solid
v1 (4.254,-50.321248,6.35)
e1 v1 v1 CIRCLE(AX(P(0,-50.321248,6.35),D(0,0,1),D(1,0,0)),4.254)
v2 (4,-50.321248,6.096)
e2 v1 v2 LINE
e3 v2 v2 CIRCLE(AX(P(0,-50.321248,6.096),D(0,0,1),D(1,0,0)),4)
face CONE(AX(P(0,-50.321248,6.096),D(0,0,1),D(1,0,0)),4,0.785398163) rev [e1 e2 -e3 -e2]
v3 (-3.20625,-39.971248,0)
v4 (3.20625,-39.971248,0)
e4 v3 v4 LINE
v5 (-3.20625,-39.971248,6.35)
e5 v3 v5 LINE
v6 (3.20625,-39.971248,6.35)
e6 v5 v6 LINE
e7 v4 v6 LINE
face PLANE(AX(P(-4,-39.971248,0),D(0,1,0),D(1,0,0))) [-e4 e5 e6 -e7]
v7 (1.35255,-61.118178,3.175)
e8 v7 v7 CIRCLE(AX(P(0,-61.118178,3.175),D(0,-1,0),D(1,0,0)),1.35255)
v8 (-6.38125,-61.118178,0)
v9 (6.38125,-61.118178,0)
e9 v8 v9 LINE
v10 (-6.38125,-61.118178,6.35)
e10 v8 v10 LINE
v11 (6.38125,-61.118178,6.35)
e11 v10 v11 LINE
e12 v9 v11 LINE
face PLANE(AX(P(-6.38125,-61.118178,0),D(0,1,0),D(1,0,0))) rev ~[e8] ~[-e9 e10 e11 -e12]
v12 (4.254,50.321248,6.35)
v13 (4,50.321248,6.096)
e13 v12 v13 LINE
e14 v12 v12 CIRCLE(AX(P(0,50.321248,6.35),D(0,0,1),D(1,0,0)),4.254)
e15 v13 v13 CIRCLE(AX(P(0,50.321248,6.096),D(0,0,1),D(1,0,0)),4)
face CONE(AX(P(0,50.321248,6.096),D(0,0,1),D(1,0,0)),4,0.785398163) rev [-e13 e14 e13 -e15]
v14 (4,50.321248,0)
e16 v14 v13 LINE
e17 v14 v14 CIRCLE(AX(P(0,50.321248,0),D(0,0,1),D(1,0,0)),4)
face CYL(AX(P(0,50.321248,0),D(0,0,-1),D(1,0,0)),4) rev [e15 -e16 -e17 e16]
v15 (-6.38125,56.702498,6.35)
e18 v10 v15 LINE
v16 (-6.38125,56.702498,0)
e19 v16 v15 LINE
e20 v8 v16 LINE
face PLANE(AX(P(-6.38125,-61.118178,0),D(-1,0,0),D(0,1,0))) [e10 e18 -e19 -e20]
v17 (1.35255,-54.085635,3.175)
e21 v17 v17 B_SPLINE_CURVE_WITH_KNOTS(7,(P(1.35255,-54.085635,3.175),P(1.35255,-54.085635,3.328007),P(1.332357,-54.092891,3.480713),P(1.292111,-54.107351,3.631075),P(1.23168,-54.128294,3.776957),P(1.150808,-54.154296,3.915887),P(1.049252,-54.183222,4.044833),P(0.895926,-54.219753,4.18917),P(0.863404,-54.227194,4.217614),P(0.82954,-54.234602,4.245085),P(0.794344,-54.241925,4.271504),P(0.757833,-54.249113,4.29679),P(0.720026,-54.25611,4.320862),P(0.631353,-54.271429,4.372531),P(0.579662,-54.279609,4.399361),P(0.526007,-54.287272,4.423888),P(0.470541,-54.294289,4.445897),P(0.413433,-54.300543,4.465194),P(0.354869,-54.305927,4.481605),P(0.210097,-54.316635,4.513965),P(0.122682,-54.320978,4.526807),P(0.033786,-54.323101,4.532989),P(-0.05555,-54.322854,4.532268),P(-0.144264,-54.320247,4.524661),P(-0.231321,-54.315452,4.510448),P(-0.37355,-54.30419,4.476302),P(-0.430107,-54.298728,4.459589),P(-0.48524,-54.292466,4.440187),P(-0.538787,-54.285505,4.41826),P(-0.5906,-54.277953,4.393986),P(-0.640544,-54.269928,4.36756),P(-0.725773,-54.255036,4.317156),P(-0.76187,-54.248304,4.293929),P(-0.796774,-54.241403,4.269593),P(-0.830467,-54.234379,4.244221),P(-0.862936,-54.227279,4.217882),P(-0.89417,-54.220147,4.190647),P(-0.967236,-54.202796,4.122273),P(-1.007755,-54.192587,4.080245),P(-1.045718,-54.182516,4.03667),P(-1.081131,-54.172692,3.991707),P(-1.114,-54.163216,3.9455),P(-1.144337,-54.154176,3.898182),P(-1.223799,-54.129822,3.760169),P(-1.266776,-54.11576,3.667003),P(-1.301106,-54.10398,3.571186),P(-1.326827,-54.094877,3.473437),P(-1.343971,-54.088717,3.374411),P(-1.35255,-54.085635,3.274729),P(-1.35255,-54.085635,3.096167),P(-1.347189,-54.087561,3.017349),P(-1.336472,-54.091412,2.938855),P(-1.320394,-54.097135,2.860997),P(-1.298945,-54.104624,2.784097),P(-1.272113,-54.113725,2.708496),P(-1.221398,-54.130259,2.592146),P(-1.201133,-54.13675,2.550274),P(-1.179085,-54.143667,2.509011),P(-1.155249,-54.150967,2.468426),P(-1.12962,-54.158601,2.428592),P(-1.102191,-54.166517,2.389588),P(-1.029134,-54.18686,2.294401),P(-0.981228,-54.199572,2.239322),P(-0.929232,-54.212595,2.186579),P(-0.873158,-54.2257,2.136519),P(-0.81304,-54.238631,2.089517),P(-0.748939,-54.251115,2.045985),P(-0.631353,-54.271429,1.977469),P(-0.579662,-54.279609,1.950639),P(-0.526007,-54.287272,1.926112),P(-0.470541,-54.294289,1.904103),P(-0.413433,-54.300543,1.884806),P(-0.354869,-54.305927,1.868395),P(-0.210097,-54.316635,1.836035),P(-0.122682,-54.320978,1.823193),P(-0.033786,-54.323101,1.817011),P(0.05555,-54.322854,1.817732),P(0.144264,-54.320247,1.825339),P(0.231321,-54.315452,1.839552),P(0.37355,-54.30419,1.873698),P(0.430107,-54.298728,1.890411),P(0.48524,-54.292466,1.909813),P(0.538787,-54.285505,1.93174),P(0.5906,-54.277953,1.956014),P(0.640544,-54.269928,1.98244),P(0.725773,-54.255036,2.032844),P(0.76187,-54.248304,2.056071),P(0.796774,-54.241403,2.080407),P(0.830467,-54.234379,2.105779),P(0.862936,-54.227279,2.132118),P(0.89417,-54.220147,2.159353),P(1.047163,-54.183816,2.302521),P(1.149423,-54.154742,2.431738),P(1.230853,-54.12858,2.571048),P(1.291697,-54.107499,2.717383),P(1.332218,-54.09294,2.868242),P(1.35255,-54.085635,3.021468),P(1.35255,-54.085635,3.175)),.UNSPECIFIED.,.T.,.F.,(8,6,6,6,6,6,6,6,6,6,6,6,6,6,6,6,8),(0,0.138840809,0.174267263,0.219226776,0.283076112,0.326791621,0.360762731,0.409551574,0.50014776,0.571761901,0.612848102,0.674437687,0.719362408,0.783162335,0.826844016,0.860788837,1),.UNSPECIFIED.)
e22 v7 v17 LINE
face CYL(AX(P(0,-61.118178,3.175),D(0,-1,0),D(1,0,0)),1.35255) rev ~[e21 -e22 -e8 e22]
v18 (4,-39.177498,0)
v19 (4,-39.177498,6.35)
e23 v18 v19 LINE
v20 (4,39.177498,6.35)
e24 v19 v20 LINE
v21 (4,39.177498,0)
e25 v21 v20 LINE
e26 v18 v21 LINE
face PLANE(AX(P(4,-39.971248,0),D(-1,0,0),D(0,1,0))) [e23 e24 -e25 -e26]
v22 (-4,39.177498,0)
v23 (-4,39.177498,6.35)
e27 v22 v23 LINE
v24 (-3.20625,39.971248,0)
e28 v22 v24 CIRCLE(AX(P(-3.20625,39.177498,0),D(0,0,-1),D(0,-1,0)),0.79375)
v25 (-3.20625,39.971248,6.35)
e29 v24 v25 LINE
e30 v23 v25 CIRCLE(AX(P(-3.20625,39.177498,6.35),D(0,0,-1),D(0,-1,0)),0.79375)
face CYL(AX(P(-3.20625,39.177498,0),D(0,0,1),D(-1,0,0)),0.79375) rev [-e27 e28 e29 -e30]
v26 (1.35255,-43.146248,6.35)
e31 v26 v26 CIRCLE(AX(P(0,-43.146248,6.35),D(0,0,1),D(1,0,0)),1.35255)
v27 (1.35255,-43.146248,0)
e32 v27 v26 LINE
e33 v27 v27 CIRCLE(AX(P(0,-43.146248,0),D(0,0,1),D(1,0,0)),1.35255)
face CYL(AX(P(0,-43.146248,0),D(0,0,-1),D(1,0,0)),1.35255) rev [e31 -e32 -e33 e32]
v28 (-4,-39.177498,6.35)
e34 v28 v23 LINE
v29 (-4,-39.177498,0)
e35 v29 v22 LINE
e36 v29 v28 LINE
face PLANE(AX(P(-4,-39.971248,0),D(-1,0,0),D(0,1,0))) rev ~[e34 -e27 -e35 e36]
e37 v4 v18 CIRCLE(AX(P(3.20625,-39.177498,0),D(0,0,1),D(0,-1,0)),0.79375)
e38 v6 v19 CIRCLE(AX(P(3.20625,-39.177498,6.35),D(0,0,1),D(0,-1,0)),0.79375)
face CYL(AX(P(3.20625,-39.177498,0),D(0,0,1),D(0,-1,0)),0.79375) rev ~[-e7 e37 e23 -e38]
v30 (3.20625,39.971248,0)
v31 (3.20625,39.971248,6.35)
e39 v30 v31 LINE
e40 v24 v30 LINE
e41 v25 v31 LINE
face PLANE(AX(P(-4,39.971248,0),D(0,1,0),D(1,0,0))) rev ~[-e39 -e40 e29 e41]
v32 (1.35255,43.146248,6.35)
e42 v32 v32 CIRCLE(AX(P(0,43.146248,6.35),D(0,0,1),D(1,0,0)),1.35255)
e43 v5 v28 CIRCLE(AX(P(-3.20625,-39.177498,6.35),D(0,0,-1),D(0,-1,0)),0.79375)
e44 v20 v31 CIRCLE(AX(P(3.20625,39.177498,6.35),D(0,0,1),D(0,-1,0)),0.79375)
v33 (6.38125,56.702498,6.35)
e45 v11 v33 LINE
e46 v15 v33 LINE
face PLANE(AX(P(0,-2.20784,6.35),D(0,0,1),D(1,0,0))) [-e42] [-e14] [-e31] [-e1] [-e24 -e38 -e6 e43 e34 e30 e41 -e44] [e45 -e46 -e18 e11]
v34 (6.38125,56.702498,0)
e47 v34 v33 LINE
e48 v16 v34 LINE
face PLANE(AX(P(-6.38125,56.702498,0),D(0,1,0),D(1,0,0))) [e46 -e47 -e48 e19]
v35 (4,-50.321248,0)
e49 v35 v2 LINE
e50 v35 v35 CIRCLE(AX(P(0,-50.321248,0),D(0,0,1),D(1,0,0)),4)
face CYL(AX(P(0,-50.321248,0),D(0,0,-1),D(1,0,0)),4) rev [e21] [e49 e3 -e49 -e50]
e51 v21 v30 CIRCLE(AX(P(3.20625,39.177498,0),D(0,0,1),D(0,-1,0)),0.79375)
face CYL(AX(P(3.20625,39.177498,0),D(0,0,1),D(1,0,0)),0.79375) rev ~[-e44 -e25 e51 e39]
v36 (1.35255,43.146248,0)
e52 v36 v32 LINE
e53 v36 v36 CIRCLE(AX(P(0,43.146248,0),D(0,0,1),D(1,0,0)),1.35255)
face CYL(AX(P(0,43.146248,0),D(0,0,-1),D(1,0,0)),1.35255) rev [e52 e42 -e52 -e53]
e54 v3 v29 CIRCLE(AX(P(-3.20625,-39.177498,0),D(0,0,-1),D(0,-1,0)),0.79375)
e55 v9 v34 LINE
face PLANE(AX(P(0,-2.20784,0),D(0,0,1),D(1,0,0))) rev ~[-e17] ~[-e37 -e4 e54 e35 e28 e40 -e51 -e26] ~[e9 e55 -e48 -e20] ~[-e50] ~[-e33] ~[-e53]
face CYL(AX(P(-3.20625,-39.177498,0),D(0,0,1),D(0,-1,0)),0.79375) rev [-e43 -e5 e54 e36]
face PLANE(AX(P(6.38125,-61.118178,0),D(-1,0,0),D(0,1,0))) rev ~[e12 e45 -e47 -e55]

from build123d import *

# Parameters (mm, degrees)
F0_W     = 12.7625
F0_H     = 117.8206766
F0_R     = 4
F0_R_2   = 1.35255
F0_W_2   = 8
F0_H_2   = 79.9424962
F1_DEPTH = 6.35
F2_R     = 0.79375
F3_SIZE  = 0.254
F4_R     = 1.35255
F5_DEPTH = 8.0325436313


# Not quite as in the source:
# - a feature names something its author has since deleted; it is built from what else it names


with BuildPart() as f1:
    # F0 (on Top) → F1 (new body)
    with BuildSketch(Plane.XY):
        with Locations((0, -2.2078402)):
            Rectangle(F0_W, F0_H)
        with Locations((0, -50.3212481)):
            Circle(F0_R, mode=Mode.SUBTRACT)
        with Locations((0, -43.1462481)):
            Circle(F0_R_2, mode=Mode.SUBTRACT)
        Rectangle(F0_W_2, F0_H_2, mode=Mode.SUBTRACT)
        with Locations((0, 43.1462481)):
            Circle(F0_R_2, mode=Mode.SUBTRACT)
        with Locations((0, 50.3212481)):
            Circle(F0_R, mode=Mode.SUBTRACT)
    extrude(amount=F1_DEPTH)

    # F2
    f2_edges = [f1.edges().sort_by_distance(p)[0] for p in [
        (4, -39.971248, 3.175),
        (-4, -39.971248, 3.175),
        (-4, 39.971248, 3.175),
        (4, 39.971248, 3.175),
    ]]
    fillet(f2_edges, radius=F2_R)

    # F3
    f3_edges = [f1.edges().sort_by_distance(p)[0] for p in [
        (-4, 50.321248, 6.35),
        (-4, -50.321248, 6.35),
    ]]
    chamfer(f3_edges, length=F3_SIZE)

    # F4 (on face) → F5 (cut, up to face)
    with BuildSketch(Plane.XZ.offset(61.1181785)):
        with Locations((0, 3.175)):
            Circle(F4_R)
    extrude(amount=-F5_DEPTH, mode=Mode.SUBTRACT)


solid = f1.part
